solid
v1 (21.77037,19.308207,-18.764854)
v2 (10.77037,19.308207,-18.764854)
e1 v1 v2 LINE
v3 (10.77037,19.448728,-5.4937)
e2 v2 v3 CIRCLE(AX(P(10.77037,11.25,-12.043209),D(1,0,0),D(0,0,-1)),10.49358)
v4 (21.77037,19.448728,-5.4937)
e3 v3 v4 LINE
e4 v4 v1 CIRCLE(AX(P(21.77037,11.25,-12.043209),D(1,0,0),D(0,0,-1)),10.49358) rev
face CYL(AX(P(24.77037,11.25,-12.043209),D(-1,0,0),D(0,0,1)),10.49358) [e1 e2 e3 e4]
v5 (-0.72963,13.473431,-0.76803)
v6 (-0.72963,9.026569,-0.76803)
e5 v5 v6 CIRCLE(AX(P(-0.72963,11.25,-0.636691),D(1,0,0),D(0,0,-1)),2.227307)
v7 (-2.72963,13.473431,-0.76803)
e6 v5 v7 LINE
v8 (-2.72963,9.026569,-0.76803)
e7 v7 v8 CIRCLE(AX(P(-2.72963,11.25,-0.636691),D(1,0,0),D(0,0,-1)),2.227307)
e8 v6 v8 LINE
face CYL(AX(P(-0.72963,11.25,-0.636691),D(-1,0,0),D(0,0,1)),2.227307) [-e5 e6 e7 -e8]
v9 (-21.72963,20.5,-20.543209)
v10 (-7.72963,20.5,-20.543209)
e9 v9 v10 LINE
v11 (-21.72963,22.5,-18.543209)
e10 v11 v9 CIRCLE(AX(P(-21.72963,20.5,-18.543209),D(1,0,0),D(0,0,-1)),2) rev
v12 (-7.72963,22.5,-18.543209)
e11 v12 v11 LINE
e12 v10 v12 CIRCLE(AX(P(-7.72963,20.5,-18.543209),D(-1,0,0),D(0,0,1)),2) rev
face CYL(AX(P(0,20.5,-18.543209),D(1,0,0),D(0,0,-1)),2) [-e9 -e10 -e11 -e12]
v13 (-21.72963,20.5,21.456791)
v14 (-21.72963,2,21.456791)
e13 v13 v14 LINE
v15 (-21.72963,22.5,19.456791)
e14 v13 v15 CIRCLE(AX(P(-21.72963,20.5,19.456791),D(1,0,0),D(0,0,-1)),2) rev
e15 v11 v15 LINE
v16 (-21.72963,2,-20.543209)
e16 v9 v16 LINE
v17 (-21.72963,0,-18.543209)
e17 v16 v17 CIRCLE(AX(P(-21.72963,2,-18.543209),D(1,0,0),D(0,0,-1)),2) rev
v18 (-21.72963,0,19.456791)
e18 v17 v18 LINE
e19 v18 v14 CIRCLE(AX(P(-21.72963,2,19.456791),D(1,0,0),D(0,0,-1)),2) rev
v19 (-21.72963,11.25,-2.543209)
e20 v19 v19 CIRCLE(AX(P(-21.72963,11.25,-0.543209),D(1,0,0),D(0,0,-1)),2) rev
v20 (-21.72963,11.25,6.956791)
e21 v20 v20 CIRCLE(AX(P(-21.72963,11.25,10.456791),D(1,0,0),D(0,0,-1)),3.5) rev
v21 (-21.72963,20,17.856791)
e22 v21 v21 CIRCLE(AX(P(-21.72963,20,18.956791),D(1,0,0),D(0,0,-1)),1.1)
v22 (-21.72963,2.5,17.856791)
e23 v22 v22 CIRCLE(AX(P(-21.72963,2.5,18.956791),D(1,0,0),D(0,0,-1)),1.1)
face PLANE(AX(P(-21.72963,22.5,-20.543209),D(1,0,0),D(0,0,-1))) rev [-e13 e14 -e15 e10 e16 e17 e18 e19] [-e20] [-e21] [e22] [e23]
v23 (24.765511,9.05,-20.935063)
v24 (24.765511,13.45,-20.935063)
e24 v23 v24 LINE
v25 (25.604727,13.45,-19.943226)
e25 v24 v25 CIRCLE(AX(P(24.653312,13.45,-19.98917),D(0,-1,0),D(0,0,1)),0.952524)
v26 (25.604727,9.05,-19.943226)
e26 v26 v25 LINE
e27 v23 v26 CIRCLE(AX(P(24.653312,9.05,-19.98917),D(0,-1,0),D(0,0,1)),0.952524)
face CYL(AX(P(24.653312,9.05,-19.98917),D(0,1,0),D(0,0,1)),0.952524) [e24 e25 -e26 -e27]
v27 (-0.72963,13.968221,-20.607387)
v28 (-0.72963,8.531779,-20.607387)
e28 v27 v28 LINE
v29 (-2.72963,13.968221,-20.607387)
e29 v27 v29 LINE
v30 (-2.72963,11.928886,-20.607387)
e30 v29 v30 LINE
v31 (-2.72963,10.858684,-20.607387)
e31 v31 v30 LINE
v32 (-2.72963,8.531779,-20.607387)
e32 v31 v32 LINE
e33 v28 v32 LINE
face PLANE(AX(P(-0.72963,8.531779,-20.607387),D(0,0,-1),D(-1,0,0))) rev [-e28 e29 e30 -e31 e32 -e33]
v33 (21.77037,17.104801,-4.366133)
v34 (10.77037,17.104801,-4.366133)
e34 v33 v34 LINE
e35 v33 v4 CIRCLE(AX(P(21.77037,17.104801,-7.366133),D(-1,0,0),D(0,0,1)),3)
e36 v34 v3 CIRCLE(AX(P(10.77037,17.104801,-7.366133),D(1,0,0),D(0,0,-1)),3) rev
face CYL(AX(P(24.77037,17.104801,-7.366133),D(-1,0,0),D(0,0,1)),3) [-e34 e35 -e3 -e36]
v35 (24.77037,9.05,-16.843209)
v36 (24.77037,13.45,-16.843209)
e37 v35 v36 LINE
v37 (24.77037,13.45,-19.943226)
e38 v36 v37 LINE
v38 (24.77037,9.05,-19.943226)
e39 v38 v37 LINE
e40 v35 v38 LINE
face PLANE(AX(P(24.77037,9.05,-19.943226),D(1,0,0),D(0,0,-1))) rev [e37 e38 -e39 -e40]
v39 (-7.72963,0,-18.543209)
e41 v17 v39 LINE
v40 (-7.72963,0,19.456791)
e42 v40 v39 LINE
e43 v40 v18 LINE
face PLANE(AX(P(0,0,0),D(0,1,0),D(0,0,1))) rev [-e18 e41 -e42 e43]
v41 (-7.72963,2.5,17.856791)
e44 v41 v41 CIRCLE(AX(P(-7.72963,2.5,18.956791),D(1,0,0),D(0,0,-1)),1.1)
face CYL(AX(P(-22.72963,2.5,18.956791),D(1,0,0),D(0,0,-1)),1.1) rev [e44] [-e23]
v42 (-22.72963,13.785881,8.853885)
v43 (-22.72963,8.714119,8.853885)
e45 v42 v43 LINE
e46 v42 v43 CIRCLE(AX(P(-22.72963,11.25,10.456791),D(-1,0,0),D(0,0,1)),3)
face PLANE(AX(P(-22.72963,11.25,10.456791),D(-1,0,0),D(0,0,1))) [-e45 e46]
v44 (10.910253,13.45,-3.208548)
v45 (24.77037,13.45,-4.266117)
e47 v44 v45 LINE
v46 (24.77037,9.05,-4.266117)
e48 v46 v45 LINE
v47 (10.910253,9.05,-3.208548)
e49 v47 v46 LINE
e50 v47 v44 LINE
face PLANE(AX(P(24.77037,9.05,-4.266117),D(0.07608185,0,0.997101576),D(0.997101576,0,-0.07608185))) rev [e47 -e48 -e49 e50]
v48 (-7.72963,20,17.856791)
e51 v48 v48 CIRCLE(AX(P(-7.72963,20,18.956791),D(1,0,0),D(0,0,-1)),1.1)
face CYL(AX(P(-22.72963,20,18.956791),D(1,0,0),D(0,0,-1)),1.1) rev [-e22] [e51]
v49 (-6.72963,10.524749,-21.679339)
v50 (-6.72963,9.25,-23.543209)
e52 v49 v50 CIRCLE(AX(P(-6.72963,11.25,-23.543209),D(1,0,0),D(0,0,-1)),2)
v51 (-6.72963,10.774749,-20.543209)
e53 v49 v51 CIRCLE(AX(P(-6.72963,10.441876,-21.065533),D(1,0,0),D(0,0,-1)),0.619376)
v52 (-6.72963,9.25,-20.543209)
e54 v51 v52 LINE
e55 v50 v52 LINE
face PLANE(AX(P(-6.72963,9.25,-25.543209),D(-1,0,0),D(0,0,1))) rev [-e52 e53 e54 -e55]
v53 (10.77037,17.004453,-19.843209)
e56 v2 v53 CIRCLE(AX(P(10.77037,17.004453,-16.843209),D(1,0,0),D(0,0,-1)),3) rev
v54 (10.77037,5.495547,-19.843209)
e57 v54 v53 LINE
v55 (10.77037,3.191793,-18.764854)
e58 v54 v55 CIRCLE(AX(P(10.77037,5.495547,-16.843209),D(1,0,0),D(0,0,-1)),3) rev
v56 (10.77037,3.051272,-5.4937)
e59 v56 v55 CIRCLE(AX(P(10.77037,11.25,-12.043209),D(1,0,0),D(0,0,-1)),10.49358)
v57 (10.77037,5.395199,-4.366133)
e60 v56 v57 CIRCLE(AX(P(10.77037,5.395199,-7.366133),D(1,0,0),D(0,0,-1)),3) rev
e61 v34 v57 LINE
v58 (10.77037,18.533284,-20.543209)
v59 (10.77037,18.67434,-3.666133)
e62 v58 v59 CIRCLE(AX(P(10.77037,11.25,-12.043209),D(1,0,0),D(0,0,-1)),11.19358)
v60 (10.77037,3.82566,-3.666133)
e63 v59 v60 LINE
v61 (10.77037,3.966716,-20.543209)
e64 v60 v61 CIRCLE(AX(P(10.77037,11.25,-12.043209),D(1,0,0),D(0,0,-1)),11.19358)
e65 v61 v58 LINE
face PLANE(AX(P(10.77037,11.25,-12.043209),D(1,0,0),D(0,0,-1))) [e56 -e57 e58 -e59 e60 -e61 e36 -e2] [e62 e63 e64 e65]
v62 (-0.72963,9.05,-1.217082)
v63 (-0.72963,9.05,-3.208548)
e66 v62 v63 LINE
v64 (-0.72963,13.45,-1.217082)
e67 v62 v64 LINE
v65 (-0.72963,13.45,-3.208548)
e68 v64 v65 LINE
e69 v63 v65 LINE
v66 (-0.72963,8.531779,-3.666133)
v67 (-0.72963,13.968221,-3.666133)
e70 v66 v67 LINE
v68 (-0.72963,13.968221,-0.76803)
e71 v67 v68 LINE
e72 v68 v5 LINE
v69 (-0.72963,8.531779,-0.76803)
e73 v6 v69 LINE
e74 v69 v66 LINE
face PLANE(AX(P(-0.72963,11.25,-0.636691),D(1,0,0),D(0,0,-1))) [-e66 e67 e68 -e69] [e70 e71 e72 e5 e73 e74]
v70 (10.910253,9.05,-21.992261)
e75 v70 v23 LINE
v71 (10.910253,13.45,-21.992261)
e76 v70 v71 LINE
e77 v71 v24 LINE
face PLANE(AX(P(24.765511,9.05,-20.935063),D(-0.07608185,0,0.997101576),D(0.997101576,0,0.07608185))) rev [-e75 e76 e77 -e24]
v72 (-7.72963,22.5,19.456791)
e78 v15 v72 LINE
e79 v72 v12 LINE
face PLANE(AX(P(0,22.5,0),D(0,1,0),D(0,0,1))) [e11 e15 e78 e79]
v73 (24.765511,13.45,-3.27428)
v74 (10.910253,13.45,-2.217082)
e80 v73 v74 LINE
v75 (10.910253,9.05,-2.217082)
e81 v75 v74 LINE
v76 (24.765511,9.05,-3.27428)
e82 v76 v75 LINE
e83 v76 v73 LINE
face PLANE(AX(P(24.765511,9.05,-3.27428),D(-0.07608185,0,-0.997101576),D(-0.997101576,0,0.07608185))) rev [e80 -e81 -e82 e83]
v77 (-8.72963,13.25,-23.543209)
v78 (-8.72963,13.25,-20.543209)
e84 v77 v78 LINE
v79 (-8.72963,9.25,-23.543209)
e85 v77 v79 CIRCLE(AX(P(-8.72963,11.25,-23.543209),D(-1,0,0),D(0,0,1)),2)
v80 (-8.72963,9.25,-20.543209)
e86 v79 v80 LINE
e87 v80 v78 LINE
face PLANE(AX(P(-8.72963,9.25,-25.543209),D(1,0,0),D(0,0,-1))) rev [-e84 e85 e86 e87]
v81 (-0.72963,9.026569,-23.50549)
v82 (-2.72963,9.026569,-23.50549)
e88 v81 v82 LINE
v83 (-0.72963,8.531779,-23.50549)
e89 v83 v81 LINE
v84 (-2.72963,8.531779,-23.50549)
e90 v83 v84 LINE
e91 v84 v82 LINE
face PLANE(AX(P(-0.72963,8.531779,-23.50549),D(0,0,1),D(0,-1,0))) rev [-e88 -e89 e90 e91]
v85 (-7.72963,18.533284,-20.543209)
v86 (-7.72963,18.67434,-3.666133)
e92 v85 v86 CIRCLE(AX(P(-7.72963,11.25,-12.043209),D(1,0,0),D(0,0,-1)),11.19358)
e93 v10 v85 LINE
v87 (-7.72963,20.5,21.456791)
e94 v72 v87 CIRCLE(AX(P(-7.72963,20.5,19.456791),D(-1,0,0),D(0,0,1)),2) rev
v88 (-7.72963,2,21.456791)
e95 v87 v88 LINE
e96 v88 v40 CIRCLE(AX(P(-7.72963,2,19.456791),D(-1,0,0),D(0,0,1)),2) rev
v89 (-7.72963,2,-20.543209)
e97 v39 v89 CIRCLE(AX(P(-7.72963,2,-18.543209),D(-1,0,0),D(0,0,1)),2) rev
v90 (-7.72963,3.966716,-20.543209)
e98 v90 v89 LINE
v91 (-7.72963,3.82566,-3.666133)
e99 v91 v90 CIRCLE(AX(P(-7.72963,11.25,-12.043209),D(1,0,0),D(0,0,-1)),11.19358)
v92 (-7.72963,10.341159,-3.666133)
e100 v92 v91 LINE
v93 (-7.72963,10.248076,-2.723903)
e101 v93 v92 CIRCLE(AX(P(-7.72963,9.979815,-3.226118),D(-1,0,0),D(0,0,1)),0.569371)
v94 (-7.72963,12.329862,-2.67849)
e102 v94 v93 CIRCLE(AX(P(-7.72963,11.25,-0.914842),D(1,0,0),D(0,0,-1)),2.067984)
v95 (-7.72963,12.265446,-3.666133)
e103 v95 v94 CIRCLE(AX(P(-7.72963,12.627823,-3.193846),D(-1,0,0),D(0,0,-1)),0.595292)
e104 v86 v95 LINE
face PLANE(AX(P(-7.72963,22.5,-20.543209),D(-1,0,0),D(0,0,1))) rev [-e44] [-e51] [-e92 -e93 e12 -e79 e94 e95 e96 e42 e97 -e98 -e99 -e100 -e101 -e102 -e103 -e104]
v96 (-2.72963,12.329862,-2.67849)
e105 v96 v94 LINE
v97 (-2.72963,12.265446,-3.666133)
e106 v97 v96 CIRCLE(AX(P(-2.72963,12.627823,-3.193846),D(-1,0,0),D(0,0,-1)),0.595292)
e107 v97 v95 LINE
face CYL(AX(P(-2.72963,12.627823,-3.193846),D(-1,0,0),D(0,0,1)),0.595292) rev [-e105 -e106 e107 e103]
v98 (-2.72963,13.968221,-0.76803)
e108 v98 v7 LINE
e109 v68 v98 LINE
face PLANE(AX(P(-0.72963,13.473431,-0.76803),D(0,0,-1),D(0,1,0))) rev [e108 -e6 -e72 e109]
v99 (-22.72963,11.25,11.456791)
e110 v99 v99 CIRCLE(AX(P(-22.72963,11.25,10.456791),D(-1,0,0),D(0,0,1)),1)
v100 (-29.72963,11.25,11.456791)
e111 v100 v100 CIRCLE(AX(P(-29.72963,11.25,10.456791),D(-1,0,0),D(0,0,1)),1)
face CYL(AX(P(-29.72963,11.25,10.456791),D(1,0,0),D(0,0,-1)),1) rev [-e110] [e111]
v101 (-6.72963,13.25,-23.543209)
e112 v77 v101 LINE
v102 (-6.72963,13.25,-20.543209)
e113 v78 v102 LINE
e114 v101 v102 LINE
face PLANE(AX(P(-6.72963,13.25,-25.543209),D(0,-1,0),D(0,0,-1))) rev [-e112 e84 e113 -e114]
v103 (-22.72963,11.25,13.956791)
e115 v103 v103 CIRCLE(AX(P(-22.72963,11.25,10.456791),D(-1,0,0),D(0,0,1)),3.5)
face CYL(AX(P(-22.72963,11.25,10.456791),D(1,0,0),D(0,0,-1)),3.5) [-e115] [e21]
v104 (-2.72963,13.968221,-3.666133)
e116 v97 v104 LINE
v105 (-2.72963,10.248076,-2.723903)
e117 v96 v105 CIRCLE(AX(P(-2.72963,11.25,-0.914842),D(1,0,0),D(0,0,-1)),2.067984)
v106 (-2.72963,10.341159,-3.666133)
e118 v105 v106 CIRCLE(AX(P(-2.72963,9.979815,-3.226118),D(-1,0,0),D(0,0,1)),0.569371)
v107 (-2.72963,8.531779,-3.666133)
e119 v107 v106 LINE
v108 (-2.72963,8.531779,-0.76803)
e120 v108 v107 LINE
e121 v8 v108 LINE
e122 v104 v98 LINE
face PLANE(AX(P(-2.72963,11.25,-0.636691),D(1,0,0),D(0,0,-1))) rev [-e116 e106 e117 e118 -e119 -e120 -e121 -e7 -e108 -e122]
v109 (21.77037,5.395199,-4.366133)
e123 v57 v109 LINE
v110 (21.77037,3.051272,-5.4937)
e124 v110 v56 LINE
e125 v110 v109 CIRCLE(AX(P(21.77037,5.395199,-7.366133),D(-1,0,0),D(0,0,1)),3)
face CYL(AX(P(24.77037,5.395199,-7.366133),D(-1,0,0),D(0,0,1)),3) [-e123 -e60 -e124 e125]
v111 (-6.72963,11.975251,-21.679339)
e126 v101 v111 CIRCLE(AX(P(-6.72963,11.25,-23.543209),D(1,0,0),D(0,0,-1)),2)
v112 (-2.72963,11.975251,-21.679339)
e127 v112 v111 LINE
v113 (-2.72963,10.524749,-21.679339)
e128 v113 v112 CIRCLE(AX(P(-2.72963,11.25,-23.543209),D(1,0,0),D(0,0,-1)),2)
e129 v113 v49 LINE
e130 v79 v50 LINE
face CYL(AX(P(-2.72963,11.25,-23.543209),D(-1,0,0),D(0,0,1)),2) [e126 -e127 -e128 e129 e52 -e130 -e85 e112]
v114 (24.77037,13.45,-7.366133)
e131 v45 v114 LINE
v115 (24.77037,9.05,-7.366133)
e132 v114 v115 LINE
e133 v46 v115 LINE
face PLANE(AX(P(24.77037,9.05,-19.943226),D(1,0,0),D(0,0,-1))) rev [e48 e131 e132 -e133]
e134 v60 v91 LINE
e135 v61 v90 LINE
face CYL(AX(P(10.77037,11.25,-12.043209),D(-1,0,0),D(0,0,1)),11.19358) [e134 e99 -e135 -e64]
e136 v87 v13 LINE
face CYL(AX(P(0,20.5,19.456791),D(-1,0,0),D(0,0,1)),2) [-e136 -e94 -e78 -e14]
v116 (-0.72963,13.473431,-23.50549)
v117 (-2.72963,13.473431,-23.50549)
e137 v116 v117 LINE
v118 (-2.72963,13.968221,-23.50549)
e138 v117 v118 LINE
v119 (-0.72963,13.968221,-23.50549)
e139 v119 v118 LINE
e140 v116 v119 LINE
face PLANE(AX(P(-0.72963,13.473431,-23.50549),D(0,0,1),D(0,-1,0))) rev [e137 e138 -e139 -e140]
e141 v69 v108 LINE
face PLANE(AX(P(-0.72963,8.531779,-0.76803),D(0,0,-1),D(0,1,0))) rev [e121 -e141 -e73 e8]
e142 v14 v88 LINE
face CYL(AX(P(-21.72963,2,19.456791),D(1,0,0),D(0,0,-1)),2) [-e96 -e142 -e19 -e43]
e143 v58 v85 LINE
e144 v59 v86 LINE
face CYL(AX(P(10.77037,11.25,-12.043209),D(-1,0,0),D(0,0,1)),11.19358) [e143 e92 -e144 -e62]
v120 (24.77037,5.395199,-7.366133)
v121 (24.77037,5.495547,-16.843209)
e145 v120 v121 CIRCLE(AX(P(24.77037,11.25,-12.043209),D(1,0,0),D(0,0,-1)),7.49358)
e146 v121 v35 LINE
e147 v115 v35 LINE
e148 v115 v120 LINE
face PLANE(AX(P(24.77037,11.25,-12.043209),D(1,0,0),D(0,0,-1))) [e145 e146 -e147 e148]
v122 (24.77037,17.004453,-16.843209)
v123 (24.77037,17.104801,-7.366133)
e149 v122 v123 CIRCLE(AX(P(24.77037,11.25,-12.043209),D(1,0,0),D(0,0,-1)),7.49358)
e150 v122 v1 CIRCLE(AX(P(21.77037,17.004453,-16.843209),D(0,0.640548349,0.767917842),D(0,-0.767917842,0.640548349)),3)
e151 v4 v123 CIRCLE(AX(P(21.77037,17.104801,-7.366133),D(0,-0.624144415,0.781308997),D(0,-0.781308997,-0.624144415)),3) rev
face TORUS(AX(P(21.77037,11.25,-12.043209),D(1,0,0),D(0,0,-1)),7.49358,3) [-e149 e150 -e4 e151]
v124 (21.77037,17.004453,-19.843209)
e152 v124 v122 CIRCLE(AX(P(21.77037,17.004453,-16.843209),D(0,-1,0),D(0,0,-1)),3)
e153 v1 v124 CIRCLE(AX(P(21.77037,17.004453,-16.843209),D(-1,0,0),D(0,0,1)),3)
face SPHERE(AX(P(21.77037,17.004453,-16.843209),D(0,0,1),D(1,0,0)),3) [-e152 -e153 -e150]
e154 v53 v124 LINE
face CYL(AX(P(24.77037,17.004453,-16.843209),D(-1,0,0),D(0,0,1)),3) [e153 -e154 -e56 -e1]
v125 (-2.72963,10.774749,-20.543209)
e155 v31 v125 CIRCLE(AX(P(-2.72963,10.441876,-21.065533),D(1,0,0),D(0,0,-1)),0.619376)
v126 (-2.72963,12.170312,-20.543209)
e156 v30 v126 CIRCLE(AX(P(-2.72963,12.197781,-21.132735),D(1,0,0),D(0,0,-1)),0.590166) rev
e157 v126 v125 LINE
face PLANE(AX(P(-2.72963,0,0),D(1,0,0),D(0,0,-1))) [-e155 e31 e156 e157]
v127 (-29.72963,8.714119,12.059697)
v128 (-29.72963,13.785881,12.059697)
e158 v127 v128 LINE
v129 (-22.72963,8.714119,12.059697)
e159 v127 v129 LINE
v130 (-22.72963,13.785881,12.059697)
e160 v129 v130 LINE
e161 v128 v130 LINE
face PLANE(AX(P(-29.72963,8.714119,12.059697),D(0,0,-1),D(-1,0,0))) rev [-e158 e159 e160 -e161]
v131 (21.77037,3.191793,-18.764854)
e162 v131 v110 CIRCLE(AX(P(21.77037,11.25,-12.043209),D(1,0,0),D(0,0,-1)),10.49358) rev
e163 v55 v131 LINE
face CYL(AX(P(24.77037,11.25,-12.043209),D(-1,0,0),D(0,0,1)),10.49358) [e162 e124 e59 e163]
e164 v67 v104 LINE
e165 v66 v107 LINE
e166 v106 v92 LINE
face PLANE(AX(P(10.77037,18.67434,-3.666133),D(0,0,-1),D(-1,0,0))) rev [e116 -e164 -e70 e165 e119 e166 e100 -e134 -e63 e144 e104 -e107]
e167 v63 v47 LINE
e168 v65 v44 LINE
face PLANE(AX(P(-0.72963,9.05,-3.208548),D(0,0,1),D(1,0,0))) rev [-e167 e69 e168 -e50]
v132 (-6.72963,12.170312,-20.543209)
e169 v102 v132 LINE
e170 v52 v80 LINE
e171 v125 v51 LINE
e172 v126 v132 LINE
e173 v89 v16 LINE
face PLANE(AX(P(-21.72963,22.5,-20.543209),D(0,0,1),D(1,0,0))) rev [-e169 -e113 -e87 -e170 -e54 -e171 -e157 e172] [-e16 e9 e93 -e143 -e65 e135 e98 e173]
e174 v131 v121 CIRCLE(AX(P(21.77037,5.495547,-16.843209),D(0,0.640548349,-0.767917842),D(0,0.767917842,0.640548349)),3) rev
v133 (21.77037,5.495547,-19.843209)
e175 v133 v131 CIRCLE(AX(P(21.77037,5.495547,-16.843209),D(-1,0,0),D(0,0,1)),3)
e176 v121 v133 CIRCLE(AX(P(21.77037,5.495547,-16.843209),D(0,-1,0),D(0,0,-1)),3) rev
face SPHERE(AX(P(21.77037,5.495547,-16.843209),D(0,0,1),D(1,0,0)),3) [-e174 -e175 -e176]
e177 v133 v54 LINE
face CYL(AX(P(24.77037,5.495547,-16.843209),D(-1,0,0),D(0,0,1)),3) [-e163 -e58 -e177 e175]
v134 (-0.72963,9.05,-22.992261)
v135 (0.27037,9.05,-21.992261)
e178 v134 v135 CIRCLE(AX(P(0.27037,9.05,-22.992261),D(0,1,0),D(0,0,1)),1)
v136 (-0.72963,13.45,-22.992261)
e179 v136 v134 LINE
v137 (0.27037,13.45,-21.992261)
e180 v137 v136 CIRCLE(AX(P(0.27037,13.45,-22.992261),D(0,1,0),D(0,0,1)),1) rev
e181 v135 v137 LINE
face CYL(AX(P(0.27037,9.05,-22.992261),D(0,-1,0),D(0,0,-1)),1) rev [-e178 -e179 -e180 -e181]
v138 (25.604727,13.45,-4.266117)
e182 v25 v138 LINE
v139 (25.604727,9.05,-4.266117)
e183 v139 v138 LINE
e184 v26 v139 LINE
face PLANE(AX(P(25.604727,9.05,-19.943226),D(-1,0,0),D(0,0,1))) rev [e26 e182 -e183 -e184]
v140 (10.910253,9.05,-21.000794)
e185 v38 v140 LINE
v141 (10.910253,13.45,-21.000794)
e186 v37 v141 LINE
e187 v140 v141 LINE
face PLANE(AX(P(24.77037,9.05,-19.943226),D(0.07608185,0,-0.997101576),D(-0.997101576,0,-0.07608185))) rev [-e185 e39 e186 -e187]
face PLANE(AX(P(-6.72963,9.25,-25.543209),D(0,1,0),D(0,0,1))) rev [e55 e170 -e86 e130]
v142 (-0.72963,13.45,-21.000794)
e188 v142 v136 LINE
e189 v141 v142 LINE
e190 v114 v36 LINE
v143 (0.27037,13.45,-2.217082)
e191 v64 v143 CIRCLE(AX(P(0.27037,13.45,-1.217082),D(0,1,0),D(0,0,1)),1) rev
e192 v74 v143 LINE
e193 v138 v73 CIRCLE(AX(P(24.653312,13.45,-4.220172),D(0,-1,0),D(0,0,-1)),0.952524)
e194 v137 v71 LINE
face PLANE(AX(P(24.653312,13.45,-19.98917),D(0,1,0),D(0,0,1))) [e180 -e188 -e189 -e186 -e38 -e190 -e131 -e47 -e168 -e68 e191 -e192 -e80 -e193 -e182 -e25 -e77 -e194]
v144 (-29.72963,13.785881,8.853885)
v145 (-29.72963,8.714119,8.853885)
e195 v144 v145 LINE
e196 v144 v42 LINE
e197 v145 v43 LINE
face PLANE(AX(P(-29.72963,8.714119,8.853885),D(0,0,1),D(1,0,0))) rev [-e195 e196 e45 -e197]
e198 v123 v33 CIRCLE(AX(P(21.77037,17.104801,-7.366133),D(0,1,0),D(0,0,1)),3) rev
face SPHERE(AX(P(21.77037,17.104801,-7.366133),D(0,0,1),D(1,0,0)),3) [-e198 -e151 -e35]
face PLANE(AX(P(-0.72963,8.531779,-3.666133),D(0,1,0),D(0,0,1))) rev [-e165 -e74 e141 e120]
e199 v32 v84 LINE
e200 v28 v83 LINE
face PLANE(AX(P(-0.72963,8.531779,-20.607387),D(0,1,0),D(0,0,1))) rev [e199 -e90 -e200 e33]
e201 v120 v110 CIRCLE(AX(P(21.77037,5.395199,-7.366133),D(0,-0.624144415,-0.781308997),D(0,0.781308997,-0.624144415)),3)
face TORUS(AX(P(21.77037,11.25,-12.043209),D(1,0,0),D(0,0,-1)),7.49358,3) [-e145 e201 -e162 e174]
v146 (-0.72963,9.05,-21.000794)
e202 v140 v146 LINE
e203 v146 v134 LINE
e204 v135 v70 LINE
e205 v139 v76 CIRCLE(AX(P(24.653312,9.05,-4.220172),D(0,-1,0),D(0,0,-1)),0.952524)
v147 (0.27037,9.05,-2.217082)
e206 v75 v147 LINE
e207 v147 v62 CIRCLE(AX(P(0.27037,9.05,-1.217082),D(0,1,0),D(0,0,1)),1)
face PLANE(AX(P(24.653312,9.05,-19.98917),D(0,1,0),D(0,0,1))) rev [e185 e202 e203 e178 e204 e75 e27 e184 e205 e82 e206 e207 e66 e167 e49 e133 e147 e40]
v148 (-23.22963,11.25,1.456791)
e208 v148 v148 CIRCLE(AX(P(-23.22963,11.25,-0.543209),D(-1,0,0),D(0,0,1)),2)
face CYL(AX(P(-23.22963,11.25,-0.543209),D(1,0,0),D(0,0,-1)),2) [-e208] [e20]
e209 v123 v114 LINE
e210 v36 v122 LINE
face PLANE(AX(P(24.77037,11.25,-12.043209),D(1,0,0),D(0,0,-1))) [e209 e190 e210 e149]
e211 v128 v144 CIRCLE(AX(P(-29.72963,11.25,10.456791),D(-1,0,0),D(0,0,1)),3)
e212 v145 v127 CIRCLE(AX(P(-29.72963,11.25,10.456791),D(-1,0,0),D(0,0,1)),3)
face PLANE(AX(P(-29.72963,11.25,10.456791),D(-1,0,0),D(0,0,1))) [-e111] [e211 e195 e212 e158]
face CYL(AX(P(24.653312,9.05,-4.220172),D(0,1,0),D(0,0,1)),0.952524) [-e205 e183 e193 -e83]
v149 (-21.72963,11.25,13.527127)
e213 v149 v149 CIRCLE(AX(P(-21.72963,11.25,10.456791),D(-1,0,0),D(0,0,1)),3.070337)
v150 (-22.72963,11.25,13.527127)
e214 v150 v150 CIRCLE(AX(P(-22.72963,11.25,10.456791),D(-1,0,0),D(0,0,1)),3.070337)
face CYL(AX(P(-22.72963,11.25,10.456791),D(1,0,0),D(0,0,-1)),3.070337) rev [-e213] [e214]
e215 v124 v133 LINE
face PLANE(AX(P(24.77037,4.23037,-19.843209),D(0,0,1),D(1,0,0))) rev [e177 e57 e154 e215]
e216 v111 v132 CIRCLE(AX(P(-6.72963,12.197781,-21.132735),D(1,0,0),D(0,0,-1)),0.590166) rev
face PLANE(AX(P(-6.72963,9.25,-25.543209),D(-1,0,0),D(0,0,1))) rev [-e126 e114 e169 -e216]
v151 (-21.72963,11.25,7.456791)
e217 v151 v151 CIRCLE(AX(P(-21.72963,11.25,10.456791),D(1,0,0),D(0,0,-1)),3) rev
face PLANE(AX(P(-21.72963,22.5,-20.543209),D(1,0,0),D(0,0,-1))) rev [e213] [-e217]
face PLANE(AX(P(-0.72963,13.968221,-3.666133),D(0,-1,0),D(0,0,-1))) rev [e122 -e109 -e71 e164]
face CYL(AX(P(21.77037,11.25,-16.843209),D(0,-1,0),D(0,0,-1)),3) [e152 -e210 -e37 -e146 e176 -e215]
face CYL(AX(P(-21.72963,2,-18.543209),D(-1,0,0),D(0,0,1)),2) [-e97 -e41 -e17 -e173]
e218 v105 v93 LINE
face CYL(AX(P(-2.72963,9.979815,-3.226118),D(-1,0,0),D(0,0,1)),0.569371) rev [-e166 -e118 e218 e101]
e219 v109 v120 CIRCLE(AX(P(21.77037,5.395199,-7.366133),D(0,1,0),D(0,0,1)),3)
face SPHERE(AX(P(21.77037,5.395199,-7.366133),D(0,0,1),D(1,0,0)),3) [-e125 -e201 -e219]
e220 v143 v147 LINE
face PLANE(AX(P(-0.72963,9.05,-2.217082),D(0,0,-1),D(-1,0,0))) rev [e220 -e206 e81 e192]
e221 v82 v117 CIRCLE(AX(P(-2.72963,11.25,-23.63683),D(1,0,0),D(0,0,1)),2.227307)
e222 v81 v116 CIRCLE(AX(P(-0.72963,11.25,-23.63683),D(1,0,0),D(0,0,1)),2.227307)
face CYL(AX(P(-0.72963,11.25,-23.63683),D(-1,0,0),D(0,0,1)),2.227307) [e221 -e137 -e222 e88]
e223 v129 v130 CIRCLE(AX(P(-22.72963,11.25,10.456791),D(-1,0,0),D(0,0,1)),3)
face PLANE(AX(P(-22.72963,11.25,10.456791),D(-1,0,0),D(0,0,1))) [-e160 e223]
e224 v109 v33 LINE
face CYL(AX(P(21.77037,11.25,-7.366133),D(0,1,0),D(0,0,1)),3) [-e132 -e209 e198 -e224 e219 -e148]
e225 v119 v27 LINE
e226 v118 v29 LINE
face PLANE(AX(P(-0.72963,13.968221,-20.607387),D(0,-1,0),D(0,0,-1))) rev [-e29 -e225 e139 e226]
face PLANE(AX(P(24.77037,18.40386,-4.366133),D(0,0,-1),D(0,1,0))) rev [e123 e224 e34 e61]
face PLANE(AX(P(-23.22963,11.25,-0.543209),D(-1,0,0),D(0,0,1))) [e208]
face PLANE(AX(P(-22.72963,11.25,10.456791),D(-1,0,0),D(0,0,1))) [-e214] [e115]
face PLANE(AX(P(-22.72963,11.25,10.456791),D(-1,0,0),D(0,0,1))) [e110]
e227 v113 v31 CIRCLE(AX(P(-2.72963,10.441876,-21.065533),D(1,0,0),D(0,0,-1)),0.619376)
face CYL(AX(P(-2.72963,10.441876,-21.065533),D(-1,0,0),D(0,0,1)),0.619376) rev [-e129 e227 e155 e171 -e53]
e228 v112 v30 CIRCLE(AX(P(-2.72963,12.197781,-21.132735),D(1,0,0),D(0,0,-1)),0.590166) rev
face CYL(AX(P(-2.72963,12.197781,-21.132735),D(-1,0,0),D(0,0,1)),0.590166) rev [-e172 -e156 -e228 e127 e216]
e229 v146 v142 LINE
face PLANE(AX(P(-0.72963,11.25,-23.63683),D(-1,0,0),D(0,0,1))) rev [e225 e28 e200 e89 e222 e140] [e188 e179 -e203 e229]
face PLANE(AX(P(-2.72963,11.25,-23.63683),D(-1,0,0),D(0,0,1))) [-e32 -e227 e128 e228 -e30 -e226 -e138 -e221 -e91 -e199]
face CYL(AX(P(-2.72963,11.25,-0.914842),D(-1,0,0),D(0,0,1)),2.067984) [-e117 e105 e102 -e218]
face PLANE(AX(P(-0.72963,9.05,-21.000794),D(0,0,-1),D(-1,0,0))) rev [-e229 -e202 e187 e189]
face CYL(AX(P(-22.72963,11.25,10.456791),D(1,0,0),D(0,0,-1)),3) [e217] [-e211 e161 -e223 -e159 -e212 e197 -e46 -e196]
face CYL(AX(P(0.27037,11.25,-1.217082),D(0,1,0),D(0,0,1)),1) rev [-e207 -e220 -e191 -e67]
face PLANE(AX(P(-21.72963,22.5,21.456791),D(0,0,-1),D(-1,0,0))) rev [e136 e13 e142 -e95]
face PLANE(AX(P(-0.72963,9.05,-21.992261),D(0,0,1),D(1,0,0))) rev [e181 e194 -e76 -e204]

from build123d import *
from build123d.topology import SkipClean

# Parameters (mm, degrees)
SKETCH1_W            = 14
SKETCH1_H            = 42
BOSS_EXTRUDE1_DEPTH  = 22.5
FILLET1_R            = 2
BOSS_EXTRUDE2_DEPTH  = 18.5
BOSS_EXTRUDE3_DEPTH  = 5
SKETCH4_R            = 1.1
CUT_EXTRUDE1_DEPTH   = 15
SKETCH5_W            = 2
SKETCH5_H            = 4
BOSS_EXTRUDE4_DEPTH  = 5
BOSS_EXTRUDE5_DEPTH  = 4
CUT_EXTRUDE2_START   = -2
CUT_EXTRUDE2_DEPTH   = 2
SKETCH12_R           = 3.5
SKETCH12_R_2         = 3.070336519
BOSS_EXTRUDE6_DEPTH  = 1
SKETCH14_R           = 3
BOSS_EXTRUDE7_DEPTH  = 1
SKETCH15_R           = 1
BOSS_EXTRUDE8_DEPTH  = 7
SKETCH16_R           = 2
BOSS_EXTRUDE9_DEPTH  = 1.5
CUT_EXTRUDE3_DEPTH   = 18.5
BOSS_EXTRUDE10_START = 32.5
BOSS_EXTRUDE10_DEPTH = 32.5
FILLET2_R            = 3
FILLET3_R            = 3
BOSS_EXTRUDE11_DEPTH = 2
BOSS_EXTRUDE12_DEPTH = 2.2
FILLET4_R            = 1


with BuildPart() as part:
    # Sketch1 → Boss-Extrude1 (new body)
    with BuildSketch(Plane(origin=(0, 0, 0), x_dir=(1, 0, 0), z_dir=(0, 1, 0))):
        with Locations((-14.72963025, -0.456790856)):
            Rectangle(SKETCH1_W, SKETCH1_H)
    extrude(amount=BOSS_EXTRUDE1_DEPTH)

    # Fillet1
    fillet1_edges = [part.edges().sort_by_distance(p)[0] for p in [
        (-14.72963025, 22.5, -20.543209144),
        (-14.72963025, 0, -20.543209144),
        (-14.72963025, 0, 21.456790856),
        (-14.72963025, 22.5, 21.456790856),
    ]]
    fillet(fillet1_edges, radius=FILLET1_R)

    # Sketch2 → Boss-Extrude2 (add)
    with BuildSketch(Plane(origin=(-7.72963025, 0, 0), x_dir=(0, 0, -1), z_dir=(1, 0, 0))):
        with BuildLine():
            Line((3.666133326, 18.67433994), (3.666133326, 3.82566006))
            ThreePointArc((3.666133326, 3.82566006), (12.136760187, 0.056811401), (20.543209144, 3.966716207))
            Line((20.543209144, 3.966716207), (20.543209144, 18.533283793))
            ThreePointArc((20.543209144, 18.533283793), (12.136760187, 22.443188599), (3.666133326, 18.67433994))
        make_face()
    extrude(amount=BOSS_EXTRUDE2_DEPTH)

    # Sketch3 → Boss-Extrude3 (add)
    with BuildSketch(Plane(origin=(-7.72963025, 0, 0), x_dir=(0, 0, -1), z_dir=(1, 0, 0))):
        with BuildLine():
            Line((3.666133326, 12.265446457), (3.666133326, 10.341158941))
            ThreePointArc((3.666133326, 10.341158941), (3.170141933, 10.546427574), (2.72390333, 10.248075799))
            ThreePointArc((2.72390333, 10.248075799), (-1.152649836, 11.204898318), (2.678489822, 12.329861741))
            ThreePointArc((2.678489822, 12.329861741), (3.155102255, 12.033793242), (3.666133326, 12.265446457))
        make_face()
    extrude(amount=BOSS_EXTRUDE3_DEPTH)

    # Sketch4 → Cut-Extrude1 (cut)
    with BuildSketch(Plane(origin=(-7.72963025, 0, 0), x_dir=(0, 0, -1), z_dir=(1, 0, 0))):
        with Locations((-18.956790856, 20)):
            Circle(SKETCH4_R)
        with Locations((-18.956790856, 2.5)):
            Circle(SKETCH4_R)
    extrude(amount=-CUT_EXTRUDE1_DEPTH, mode=Mode.SUBTRACT)

    # Sketch5 → Boss-Extrude4 (add)
    with BuildSketch(Plane(origin=(0, 0, -20.543209144), x_dir=(-1, 0, 0), z_dir=(0, 0, -1))):
        with Locations((7.72963025, 11.25)):
            Rectangle(SKETCH5_W, SKETCH5_H)
    extrude(amount=BOSS_EXTRUDE4_DEPTH)

    # Sketch6 → Boss-Extrude5 (add)
    with BuildSketch(Plane(origin=(-6.72963025, 0, 0), x_dir=(0, 0, -1), z_dir=(1, 0, 0))):
        with BuildLine():
            ThreePointArc((21.679339079, 11.975250565), (21.032871281, 11.616126027), (20.543209144, 12.17031195))
            Line((20.543209144, 12.17031195), (20.543209144, 10.774749435))
            ThreePointArc((20.543209144, 10.774749435), (21.198638933, 11.046780591), (21.679339079, 10.524749435))
            ThreePointArc((21.679339079, 10.524749435), (25.543209144, 11.25), (21.679339079, 11.975250565))
        make_face()
    extrude(amount=BOSS_EXTRUDE5_DEPTH)

    # Sketch7 → Cut-Extrude2 (cut)
    with BuildSketch(Plane(origin=(-6.72963025, 0, 0), x_dir=(0, 0, -1), z_dir=(1, 0, 0)).offset(CUT_EXTRUDE2_START)):
        with BuildLine():
            Line((23.543209144, 13.25), (23.543209144, 13.967200788))
            Line((23.543209144, 13.967200788), (25.760178749, 13.967200788))
            Line((25.760178749, 13.967200788), (25.760178749, 8.970470958))
            Line((25.760178749, 8.970470958), (23.543209144, 8.970470958))
            Line((23.543209144, 8.970470958), (23.543209144, 9.25))
            ThreePointArc((23.543209144, 9.25), (25.543209144, 11.25), (23.543209144, 13.25))
        make_face()
    extrude(amount=CUT_EXTRUDE2_DEPTH, mode=Mode.SUBTRACT)

    # Sketch12 → Boss-Extrude6 (add)
    with BuildSketch(Plane.ZY.offset(21.72963025)):
        with Locations(Location((10.456790856, 11.25, 0), (0, 0, 180))):
            Circle(SKETCH12_R)
        with Locations((10.456790856, 11.25)):
            Circle(SKETCH12_R_2, mode=Mode.SUBTRACT)
    extrude(amount=BOSS_EXTRUDE6_DEPTH)

    # Sketch14 → Boss-Extrude7 (add)
    with BuildSketch(Plane.ZY.offset(21.72963025)):
        with Locations(Location((10.456790856, 11.25, 0), (0, 0, 180))):
            Circle(SKETCH14_R)
    extrude(amount=BOSS_EXTRUDE7_DEPTH)

    # Sketch15 → Boss-Extrude8 (add)
    with SkipClean():  # the faces are left unmerged after this step: merging them gives an invalid solid
        with BuildSketch(Plane.ZY.offset(22.72963025)):
            with BuildLine():
                Line((8.853884636, 8.714119157), (8.853884636, 13.785880843))
                ThreePointArc((8.853884636, 13.785880843), (10.456790856, 14.25), (12.059697077, 13.785880843))
                Line((12.059697077, 13.785880843), (12.059697077, 8.714119157))
                ThreePointArc((12.059697077, 8.714119157), (10.456790856, 8.25), (8.853884636, 8.714119157))
            make_face()
            with Locations((10.456790856, 11.25)):
                Circle(SKETCH15_R, mode=Mode.SUBTRACT)
        extrude(amount=BOSS_EXTRUDE8_DEPTH)

    # Sketch16 → Boss-Extrude9 (add)
    with SkipClean():  # the faces are left unmerged after this step: merging them gives an invalid solid
        with BuildSketch(Plane.ZY.offset(21.72963025)):
            with Locations(Location((-0.543209144, 11.25, 0), (0, 0, 180))):
                Circle(SKETCH16_R)
        extrude(amount=BOSS_EXTRUDE9_DEPTH)

    # Sketch17 → Cut-Extrude3 (cut)
    with SkipClean():  # the faces are left unmerged after this step: merging them gives an invalid solid
        with BuildSketch(Plane(origin=(10.77036975, 0, 0), x_dir=(0, 0, -1), z_dir=(1, 0, 0))):
            with BuildLine():
                Line((19.843209144, 4.230369564), (19.843209144, 18.269630436))
                ThreePointArc((19.843209144, 18.269630436), (12.134214683, 21.743184905), (4.366133326, 18.403860381))
                Line((4.366133326, 18.403860381), (4.366133326, 4.096139619))
                ThreePointArc((4.366133326, 4.096139619), (12.134214683, 0.756815095), (19.843209144, 4.230369564))
            make_face()
        extrude(amount=-CUT_EXTRUDE3_DEPTH, mode=Mode.SUBTRACT)

    # Sketch18 → Boss-Extrude10 (add)
    with SkipClean():  # the faces are left unmerged after this step: merging them gives an invalid solid
        with BuildSketch(Plane(origin=(-7.72963025, 0, 0), x_dir=(0, 0, -1), z_dir=(1, 0, 0)).offset(BOSS_EXTRUDE10_START)):
            with BuildLine():
                Line((19.843209144, 4.230369564), (19.843209144, 18.269630436))
                ThreePointArc((19.843209144, 18.269630436), (12.134214683, 21.743184905), (4.366133326, 18.403860381))
                Line((4.366133326, 18.403860381), (4.366133326, 4.096139619))
                ThreePointArc((4.366133326, 4.096139619), (12.134214683, 0.756815095), (19.843209144, 4.230369564))
            make_face()
        extrude(amount=-BOSS_EXTRUDE10_DEPTH)

    # Fillet2
    # the kernel refuses this fillet: 3 mm, written as the material it takes off along each edge
    with BuildSketch(Plane(origin=(24.77036975, 11.25, -12.043209144), x_dir=(0, -0.03508404520009265, 0.9993843653832083), z_dir=(0, 0.9993843653832083, 0.03508404520009265))) as fillet2_piece_1:
        with BuildLine():
            CenterArc((10.493579535 - FILLET2_R, -FILLET2_R), FILLET2_R, 0, 90)
            Line((10.493579535 - FILLET2_R, 0), (10.493579535, 0))
            Line((10.493579535, 0), (10.493579535, -FILLET2_R))
        make_face()
    revolve(axis=Axis((24.77036975, 11.25, -12.043209144), (1, 0, 0)), revolution_arc=176.972646772, mode=Mode.SUBTRACT)
    with BuildSketch(Plane(origin=(24.77036975, -3.269630436, -19.843209144), x_dir=(-1, 0, 0), z_dir=(0, 1, 0))) as fillet2_piece_2:
        with BuildLine():
            CenterArc((FILLET2_R, FILLET2_R), FILLET2_R, 180, 90)
            Line((0, FILLET2_R), (0, 0))
            Line((0, 0), (FILLET2_R, 0))
        make_face()
    extrude(amount=29.039260873, mode=Mode.SUBTRACT)
    with BuildSketch(Plane(origin=(24.77036975, 11.25, -12.043209144), x_dir=(0, 0.017745103398297987, -0.9998425432563788), z_dir=(0, -0.9998425432563788, -0.017745103398297987))) as fillet2_piece_3:
        with BuildLine():
            CenterArc((10.493579535 - FILLET2_R, -FILLET2_R), FILLET2_R, 0, 90)
            Line((10.493579535 - FILLET2_R, 0), (10.493579535, 0))
            Line((10.493579535, 0), (10.493579535, -FILLET2_R))
        make_face()
    revolve(axis=Axis((24.77036975, 11.25, -12.043209144), (1, 0, 0)), revolution_arc=176.972646772, mode=Mode.SUBTRACT)
    with BuildSketch(Plane(origin=(24.77036975, 25.903860381, -4.366133326), x_dir=(-1, 0, 0), z_dir=(0, -1, 0))) as fillet2_piece_4:
        with BuildLine():
            CenterArc((FILLET2_R, FILLET2_R), FILLET2_R, 180, 90)
            Line((0, FILLET2_R), (0, 0))
            Line((0, 0), (FILLET2_R, 0))
        make_face()
    extrude(amount=29.307720762, mode=Mode.SUBTRACT)

    # Fillet3
    fillet3_edges = [part.edges().sort_by_distance(p)[0] for p in [
        (16.27036975, 4.096139619, -4.366133326),
        (16.27036975, 18.403860381, -4.366133326),
        (16.27036975, 18.269630436, -19.843209144),
        (16.27036975, 4.230369564, -19.843209144),
        (23.939626378, 17.904127425, -18.915484598),
        (23.939626378, 4.595872575, -18.915484598),
        (23.942018914, 18.027736711, -5.296365269),
        (23.942018914, 4.472263289, -5.296365269),
    ]]
    fillet(fillet3_edges, radius=FILLET3_R)

    # Sketch19 → Boss-Extrude11 (add)
    with BuildSketch(Plane(origin=(-2.72963025, 0, 0), x_dir=(0, 0, -1), z_dir=(1, 0, 0))):
        with BuildLine():
            Line((0.768030026, 13.473431353), (0.768030026, 13.968221025))
            Line((0.768030026, 13.968221025), (3.666133326, 13.968221025))
            Line((3.666133326, 13.968221025), (3.666133326, 8.531778975))
            Line((3.666133326, 8.531778975), (0.768030026, 8.531778975))
            Line((0.768030026, 8.531778975), (0.768030026, 9.026568647))
            ThreePointArc((0.768030026, 9.026568647), (-1.590616444, 11.25), (0.768030026, 13.473431353))
        make_face()
        with BuildLine():
            Line((23.505490349, 8.531778975), (23.505490349, 9.026568647))
            ThreePointArc((23.505490349, 9.026568647), (25.864136819, 11.25), (23.505490349, 13.473431353))
            Line((23.505490349, 13.473431353), (23.505490349, 13.968221025))
            Line((23.505490349, 13.968221025), (20.607387049, 13.968221025))
            Line((20.607387049, 13.968221025), (20.607387049, 8.531778975))
            Line((20.607387049, 8.531778975), (23.505490349, 8.531778975))
        make_face()
    extrude(amount=BOSS_EXTRUDE11_DEPTH)

    # Sketch22 → Boss-Extrude12 (add, symmetric)
    with BuildSketch(Plane(origin=(0, 11.25, 0), x_dir=(-1, 0, 0), z_dir=(0, -1, 0))):
        with BuildLine():
            Line((0.72963025, 3.208547986), (0.72963025, 2.217081676))
            Line((0.72963025, 2.217081676), (-10.91025311, 2.217081676))
            Line((-10.91025311, 2.217081676), (-24.765511007, 3.274279543))
            ThreePointArc((-24.765511007, 3.274279543), (-25.380466801, 3.60490992), (-25.6047274, 4.26611659))
            Line((-25.6047274, 4.26611659), (-25.6047274, 19.94322588))
            ThreePointArc((-25.6047274, 19.94322588), (-25.380466801, 20.604432549), (-24.765511007, 20.935062926))
            Line((-24.765511007, 20.935062926), (-10.91025311, 21.992260794))
            Line((-10.91025311, 21.992260794), (0.72963025, 21.992260794))
            Line((0.72963025, 21.992260794), (0.72963025, 21.000794484))
            Line((0.72963025, 21.000794484), (-10.91025311, 21.000794484))
            Line((-10.91025311, 21.000794484), (-24.77036975, 19.94322588))
            Line((-24.77036975, 19.94322588), (-24.77036975, 4.26611659))
            Line((-24.77036975, 4.26611659), (-10.91025311, 3.208547986))
            Line((-10.91025311, 3.208547986), (0.72963025, 3.208547986))
        make_face()
    extrude(amount=BOSS_EXTRUDE12_DEPTH, both=True)

    # Fillet4
    fillet4_edges = [part.edges().sort_by_distance(p)[0] for p in [
        (-0.72963025, 11.25, -21.992260794),
        (-0.72963025, 11.25, -2.217081676),
    ]]
    fillet(fillet4_edges, radius=FILLET4_R)


solid = part.part
